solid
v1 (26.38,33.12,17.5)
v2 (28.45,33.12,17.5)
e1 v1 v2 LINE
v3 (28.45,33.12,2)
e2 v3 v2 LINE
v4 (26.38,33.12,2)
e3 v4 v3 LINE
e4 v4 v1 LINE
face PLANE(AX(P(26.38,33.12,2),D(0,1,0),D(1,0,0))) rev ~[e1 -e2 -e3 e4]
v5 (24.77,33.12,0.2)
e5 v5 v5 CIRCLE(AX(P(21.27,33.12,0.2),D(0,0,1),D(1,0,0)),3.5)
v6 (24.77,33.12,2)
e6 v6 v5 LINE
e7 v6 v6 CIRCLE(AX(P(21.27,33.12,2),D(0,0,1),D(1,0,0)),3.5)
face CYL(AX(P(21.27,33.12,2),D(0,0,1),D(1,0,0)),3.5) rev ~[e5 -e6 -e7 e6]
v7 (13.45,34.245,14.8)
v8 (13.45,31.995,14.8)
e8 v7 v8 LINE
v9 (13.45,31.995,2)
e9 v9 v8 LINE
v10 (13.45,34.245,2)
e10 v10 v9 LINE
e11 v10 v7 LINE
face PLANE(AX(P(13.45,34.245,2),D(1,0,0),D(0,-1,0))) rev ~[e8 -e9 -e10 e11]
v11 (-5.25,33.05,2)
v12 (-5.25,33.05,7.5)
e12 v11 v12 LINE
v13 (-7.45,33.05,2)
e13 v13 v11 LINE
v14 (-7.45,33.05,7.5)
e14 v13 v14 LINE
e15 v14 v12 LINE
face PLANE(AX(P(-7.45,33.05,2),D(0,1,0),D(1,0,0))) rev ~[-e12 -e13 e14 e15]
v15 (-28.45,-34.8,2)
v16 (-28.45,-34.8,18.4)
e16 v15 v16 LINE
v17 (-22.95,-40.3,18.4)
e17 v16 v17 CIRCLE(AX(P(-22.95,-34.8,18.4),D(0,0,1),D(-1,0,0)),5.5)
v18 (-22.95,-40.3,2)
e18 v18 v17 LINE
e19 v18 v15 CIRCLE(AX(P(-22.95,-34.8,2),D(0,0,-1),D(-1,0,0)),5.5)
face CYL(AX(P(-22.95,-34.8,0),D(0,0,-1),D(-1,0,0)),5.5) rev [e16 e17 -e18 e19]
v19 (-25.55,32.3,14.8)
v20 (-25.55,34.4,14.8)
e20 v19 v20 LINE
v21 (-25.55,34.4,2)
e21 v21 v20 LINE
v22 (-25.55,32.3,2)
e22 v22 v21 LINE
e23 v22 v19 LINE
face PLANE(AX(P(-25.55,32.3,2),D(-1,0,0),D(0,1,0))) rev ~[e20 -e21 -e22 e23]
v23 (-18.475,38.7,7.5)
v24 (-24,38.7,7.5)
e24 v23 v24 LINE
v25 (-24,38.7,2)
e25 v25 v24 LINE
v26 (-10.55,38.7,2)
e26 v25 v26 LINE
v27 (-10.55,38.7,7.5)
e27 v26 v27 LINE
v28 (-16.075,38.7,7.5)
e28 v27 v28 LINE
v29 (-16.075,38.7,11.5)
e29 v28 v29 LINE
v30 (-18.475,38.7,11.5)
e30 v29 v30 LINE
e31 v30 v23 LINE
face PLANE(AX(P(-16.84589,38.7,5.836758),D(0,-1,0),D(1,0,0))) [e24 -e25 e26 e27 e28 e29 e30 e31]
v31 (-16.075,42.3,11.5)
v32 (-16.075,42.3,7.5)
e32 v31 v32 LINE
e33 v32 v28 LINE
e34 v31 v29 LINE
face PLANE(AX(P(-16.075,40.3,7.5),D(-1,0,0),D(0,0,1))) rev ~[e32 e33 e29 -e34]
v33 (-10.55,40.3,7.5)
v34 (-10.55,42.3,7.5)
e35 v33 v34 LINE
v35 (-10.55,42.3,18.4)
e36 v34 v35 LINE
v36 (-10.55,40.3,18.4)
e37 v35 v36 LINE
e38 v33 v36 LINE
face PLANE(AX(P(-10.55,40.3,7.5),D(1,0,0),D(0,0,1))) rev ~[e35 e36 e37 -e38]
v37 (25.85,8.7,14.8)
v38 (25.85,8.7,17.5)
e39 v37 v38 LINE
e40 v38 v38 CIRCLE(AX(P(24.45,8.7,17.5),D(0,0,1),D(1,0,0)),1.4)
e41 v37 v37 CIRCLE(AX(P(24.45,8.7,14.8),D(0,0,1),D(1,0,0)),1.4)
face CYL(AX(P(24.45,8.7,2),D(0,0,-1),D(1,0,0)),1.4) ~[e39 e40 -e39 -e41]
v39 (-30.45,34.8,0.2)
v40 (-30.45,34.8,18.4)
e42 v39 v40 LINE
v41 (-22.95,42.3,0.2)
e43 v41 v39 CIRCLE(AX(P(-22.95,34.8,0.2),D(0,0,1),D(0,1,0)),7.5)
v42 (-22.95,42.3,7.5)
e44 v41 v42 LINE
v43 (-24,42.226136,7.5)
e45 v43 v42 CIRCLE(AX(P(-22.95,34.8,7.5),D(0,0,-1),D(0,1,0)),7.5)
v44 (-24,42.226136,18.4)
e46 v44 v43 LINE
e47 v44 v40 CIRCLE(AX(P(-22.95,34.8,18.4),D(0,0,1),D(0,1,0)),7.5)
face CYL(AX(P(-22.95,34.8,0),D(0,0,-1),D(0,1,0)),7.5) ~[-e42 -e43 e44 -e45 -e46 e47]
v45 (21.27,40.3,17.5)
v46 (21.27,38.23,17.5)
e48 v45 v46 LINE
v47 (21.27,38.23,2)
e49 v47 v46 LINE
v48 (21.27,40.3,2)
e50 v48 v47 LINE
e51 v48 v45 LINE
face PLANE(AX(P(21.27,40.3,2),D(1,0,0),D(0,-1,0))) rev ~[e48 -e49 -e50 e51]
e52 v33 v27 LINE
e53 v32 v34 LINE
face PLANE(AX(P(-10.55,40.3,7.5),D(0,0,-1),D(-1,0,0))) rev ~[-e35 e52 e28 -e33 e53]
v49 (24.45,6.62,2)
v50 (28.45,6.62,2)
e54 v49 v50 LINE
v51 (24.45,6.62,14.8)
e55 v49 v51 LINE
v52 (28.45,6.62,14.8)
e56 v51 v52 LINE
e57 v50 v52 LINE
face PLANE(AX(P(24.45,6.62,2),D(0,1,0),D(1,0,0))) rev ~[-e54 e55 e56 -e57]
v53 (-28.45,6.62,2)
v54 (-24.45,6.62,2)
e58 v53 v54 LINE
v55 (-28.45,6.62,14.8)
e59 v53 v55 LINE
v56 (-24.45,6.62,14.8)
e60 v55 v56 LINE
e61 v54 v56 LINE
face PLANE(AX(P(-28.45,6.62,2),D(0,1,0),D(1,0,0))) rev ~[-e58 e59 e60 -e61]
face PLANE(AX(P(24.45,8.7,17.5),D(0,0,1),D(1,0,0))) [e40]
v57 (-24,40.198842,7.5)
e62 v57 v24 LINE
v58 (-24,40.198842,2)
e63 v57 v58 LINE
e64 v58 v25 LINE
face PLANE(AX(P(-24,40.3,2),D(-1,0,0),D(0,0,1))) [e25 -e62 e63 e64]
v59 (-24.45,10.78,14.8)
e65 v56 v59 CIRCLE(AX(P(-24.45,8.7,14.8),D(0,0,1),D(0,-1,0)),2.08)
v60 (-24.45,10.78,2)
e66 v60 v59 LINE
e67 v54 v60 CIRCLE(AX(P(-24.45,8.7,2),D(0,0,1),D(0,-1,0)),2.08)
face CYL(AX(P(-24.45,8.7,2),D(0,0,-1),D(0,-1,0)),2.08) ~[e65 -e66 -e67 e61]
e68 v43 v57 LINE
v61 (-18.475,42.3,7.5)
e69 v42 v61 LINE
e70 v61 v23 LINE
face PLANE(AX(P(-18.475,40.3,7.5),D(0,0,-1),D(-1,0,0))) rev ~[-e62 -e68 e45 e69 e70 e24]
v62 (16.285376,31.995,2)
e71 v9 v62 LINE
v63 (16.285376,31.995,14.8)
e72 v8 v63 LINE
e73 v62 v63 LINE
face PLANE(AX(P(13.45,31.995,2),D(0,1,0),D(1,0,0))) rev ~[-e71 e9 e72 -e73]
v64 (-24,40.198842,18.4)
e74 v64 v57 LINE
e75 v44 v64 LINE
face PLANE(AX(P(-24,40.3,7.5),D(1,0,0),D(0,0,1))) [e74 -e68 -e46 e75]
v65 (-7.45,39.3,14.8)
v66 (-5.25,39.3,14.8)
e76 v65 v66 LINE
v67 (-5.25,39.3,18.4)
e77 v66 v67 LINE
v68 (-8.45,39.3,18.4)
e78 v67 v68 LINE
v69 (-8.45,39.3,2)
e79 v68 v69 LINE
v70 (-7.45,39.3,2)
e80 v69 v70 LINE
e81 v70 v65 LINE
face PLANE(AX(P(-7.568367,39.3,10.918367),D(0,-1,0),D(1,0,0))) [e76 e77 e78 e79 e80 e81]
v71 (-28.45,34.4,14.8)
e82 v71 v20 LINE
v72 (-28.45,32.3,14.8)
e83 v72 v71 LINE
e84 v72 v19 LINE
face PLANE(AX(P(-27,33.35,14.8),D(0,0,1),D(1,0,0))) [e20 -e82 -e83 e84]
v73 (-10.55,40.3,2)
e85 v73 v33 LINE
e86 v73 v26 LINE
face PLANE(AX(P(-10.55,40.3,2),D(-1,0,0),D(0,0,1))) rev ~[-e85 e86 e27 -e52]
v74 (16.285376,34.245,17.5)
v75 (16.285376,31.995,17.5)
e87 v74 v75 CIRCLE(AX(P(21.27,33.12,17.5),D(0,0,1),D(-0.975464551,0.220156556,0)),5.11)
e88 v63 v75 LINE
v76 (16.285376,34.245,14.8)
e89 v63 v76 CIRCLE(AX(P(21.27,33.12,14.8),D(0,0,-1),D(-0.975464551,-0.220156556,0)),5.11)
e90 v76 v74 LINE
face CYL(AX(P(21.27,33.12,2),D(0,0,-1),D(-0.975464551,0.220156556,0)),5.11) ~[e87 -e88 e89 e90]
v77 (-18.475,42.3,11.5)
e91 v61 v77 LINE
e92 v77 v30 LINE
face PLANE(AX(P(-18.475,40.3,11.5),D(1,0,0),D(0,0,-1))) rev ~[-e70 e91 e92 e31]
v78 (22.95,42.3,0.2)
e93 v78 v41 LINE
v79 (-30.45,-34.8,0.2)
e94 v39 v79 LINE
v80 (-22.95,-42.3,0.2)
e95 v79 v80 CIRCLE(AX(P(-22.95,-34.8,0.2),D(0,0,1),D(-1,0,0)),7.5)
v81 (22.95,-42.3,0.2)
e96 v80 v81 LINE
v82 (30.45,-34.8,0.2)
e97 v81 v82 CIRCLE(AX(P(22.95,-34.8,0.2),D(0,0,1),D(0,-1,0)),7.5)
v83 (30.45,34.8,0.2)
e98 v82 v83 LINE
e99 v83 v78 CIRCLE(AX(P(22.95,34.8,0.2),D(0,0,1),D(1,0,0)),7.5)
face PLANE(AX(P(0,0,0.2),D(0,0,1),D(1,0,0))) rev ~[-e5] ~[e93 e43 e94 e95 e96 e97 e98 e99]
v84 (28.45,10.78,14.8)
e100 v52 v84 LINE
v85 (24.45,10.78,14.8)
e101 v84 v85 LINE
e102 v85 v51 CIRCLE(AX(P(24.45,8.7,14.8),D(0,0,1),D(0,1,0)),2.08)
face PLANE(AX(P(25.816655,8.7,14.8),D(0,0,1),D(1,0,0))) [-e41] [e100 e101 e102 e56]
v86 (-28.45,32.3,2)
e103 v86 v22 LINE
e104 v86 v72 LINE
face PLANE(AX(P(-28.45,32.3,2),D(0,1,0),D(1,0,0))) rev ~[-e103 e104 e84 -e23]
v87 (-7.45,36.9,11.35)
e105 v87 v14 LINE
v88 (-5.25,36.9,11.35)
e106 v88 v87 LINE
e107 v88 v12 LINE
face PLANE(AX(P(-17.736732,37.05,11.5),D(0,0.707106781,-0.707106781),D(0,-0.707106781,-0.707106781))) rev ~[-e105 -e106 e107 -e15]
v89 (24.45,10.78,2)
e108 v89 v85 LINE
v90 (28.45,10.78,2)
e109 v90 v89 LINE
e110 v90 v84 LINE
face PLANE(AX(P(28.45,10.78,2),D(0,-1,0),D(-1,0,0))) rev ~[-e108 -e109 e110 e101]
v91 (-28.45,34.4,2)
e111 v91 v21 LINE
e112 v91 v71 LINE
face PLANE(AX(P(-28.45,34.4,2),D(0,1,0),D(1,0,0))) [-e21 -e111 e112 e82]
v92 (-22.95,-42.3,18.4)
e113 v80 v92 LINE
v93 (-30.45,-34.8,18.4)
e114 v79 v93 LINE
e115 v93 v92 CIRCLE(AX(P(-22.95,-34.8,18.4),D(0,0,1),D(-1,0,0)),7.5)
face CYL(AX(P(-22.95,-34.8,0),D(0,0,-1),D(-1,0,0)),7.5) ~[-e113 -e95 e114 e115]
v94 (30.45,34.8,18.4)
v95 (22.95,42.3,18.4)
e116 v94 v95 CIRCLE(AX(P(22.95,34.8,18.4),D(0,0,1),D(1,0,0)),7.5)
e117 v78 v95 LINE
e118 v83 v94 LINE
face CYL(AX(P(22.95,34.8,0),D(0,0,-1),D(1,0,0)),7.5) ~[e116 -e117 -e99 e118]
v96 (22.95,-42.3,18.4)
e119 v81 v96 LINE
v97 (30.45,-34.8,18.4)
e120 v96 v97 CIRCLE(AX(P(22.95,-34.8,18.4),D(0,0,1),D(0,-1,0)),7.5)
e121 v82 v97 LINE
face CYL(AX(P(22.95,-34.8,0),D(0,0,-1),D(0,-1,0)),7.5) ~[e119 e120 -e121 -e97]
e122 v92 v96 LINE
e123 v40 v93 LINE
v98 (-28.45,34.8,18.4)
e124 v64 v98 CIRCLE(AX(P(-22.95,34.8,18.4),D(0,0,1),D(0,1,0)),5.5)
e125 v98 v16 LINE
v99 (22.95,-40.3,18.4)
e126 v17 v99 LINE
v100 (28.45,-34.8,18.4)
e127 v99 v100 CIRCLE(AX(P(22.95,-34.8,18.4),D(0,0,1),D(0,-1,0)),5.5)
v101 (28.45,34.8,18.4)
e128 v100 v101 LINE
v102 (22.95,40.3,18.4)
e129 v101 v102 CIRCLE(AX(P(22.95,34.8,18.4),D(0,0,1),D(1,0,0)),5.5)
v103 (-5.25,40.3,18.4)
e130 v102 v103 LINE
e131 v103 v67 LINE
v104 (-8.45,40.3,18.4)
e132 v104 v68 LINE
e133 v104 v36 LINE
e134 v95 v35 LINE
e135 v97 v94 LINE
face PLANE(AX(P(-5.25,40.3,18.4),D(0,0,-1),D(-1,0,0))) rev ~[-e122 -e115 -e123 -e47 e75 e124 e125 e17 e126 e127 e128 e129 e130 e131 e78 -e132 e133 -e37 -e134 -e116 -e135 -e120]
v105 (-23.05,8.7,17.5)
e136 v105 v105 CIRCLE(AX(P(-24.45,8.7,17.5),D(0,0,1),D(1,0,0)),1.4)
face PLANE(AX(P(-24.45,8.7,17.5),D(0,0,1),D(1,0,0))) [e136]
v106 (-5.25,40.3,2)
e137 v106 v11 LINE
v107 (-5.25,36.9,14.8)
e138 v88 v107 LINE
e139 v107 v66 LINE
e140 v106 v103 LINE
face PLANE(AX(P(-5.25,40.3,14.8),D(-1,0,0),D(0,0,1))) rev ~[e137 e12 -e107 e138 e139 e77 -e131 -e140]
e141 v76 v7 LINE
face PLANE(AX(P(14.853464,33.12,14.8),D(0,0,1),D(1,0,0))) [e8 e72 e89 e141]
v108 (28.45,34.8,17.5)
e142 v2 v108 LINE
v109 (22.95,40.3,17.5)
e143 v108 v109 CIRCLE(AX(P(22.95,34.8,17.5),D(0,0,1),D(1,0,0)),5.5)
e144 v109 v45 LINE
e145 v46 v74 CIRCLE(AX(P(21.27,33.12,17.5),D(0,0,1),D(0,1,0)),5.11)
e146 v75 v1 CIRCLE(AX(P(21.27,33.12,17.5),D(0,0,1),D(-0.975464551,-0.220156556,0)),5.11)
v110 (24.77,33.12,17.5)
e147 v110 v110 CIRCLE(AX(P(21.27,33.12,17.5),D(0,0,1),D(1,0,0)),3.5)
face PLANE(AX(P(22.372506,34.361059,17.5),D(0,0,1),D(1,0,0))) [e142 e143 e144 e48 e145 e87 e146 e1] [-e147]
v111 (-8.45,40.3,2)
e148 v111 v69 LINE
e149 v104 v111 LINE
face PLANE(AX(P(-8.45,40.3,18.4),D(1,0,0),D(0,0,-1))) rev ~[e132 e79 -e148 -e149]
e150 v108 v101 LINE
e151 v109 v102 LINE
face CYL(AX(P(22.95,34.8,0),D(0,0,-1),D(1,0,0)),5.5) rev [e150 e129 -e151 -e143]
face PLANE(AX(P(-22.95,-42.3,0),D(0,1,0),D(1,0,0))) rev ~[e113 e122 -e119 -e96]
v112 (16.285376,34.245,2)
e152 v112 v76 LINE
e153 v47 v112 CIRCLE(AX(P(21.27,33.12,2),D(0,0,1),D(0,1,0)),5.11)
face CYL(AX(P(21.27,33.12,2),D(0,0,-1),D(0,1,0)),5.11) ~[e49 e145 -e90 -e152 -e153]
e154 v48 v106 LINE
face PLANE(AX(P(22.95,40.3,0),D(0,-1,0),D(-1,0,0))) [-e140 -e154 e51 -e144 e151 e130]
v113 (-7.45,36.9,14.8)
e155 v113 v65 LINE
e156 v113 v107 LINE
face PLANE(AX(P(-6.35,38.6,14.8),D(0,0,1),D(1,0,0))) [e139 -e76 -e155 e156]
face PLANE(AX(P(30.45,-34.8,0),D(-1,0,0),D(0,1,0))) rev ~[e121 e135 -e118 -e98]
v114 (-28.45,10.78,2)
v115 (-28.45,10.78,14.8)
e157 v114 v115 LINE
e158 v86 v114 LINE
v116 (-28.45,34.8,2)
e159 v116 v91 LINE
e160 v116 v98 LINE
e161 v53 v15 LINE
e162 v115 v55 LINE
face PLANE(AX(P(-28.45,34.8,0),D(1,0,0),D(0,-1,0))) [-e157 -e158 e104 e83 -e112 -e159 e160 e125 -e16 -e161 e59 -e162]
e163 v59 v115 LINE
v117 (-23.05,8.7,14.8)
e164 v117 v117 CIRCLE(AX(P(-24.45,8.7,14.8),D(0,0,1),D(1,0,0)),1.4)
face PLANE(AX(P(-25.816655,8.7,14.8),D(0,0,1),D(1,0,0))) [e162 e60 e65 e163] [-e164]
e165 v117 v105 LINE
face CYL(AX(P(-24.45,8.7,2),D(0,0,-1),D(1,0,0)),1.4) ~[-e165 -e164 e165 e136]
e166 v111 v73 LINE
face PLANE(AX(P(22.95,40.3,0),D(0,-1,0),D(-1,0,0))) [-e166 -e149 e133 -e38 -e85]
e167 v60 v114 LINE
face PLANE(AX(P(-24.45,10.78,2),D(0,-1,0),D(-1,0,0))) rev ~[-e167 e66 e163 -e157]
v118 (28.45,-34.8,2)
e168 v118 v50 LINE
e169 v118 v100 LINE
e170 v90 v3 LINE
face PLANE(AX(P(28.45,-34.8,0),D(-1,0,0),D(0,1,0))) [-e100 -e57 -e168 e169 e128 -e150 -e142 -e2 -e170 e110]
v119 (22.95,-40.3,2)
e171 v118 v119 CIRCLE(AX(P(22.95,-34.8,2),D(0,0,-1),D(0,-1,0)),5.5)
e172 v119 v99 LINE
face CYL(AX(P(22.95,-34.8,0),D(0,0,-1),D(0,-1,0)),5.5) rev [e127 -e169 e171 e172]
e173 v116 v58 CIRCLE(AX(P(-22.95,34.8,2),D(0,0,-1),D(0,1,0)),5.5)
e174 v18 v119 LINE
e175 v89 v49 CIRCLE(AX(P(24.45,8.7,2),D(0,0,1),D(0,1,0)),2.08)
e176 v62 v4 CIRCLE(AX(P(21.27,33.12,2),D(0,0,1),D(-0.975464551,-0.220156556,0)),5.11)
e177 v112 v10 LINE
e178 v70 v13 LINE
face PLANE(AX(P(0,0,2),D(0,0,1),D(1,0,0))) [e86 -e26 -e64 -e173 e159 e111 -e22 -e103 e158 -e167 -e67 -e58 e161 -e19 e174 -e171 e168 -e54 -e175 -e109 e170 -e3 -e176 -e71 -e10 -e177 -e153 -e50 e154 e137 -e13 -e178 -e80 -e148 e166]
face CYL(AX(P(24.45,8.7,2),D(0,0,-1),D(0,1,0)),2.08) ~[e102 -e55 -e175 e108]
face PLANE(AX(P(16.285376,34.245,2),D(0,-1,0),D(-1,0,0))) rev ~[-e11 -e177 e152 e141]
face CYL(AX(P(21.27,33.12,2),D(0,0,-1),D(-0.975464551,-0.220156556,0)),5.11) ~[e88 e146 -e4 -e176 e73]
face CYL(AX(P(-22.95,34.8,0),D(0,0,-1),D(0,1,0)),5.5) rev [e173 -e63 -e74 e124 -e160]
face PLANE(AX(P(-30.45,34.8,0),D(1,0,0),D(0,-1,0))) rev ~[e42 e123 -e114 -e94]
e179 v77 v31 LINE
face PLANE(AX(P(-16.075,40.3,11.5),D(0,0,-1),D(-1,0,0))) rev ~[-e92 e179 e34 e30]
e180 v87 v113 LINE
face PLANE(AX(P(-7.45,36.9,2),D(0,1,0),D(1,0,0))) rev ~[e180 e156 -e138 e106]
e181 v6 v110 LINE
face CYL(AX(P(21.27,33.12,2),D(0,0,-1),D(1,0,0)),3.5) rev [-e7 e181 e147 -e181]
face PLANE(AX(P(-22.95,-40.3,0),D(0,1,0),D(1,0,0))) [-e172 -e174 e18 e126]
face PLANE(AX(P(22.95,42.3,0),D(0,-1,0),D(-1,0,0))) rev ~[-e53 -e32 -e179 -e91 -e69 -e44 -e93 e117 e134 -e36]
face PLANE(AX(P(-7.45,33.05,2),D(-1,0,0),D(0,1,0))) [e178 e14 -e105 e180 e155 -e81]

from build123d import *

# Parameters (mm, degrees)
F1_DEPTH    = 18.4
F2_T        = -2
F3_DEPTH    = 0.2
F4_R        = 1.4
F4_W        = 2.9
F4_H        = 2.1
F4_W_2      = 2.2
F4_H_2      = 3.4
F5_DEPTH    = 12.8
F4_R_2      = 3.5
F6_DEPTH    = 15.5
F4_H_3      = 3.85
F7_DEPTH    = 9.5
F8_T4_DEPTH = 22.7734639037
F9_DEPTH    = 1.801
F11_DEPTH   = 1
F10_W       = 1.05
F10_H       = 5.5
F12_DEPTH   = 1.6
F10_H_2     = 10.9
F13_DEPTH   = 3


# Not quite as in the source:
# - a fillet or chamfer that OpenCascade refuses, or shapes differently, is made with other operations: its cross-section is extruded or revolved along the edge and cut away or added


with BuildPart() as f1:
    # F0 (on Top) → F1 (new body)
    with BuildSketch(Plane.XY):
        with BuildLine():
            Line((-22.95, -42.3), (22.95, -42.3))
            ThreePointArc((22.95, -42.3), (28.2533008589, -40.1033008589), (30.45, -34.8))
            Line((30.45, -34.8), (30.45, 34.8))
            ThreePointArc((30.45, 34.8), (28.2533008589, 40.1033008589), (22.95, 42.3))
            Line((22.95, 42.3), (-22.95, 42.3))
            ThreePointArc((-22.95, 42.3), (-28.2533008589, 40.1033008589), (-30.45, 34.8))
            Line((-30.45, 34.8), (-30.45, -34.8))
            ThreePointArc((-30.45, -34.8), (-28.2533008589, -40.1033008589), (-22.95, -42.3))
        make_face()
    extrude(amount=F1_DEPTH)

    # F2
    f2_openings = [f1.faces().sort_by_distance(p)[0] for p in [
        (0, 0, 18.4),
    ]]
    offset(amount=F2_T, openings=f2_openings)

    # F3 (cut): a face of the model
    f3_faces = [f1.faces().sort_by_distance(p)[0] for p in [
        (0, 0, 0),
    ]]
    extrude(f3_faces, amount=-F3_DEPTH, mode=Mode.SUBTRACT)

    # F4 (on face) → F5 (join)
    with BuildSketch(Plane.XY.offset(2)):
        with BuildLine():
            Line((24.45, 6.62), (28.45, 6.62))
            Line((28.45, 6.62), (28.45, 10.78))
            Line((28.45, 10.78), (24.45, 10.78))
            ThreePointArc((24.45, 10.78), (22.37, 8.7), (24.45, 6.62))
        make_face()
        with Locations((24.45, 8.7)):
            Circle(F4_R, mode=Mode.SUBTRACT)
        with BuildLine():
            ThreePointArc((-24.45, 6.62), (-22.37, 8.7), (-24.45, 10.78))
            Line((-24.45, 10.78), (-28.45, 10.78))
            Line((-28.45, 10.78), (-28.45, 6.62))
            Line((-28.45, 6.62), (-24.45, 6.62))
        make_face()
        with Locations((-24.45, 8.7)):
            Circle(F4_R, mode=Mode.SUBTRACT)
        with Locations((-27, 33.35)):
            Rectangle(F4_W, F4_H)
        with Locations((-6.35, 38.6)):
            Rectangle(F4_W_2, F4_H_2)
        with BuildLine():
            ThreePointArc((16.2853761426, 31.995), (16.16, 33.12), (16.2853761426, 34.245))
            Line((16.2853761426, 34.245), (13.45, 34.245))
            Line((13.45, 34.245), (13.45, 31.995))
            Line((13.45, 31.995), (16.2853761426, 31.995))
        make_face()
    extrude(amount=F5_DEPTH)

    # F4 (on face) → F6 (join)
    with BuildSketch(Plane.XY.offset(2)):
        with BuildLine():
            Line((22.95, 40.3), (21.27, 40.3))
            Line((21.27, 40.3), (21.27, 38.23))
            ThreePointArc((21.27, 38.23), (18.0791262952, 37.1112936499), (16.2853761426, 34.245))
            ThreePointArc((16.2853761426, 34.245), (16.16, 33.12), (16.2853761426, 31.995))
            ThreePointArc((16.2853761426, 31.995), (21.835982371, 28.0414407598), (26.38, 33.12))
            Line((26.38, 33.12), (28.45, 33.12))
            Line((28.45, 33.12), (28.45, 34.8))
            ThreePointArc((28.45, 34.8), (26.8390872965, 38.6890872965), (22.95, 40.3))
        make_face()
        with Locations((21.27, 33.12)):
            Circle(F4_R_2, mode=Mode.SUBTRACT)
        with Locations((24.45, 8.7)):
            Circle(F4_R)
        with Locations((-24.45, 8.7)):
            Circle(F4_R)
    extrude(amount=F6_DEPTH)

    # F4 (on face) → F7 (join)
    with BuildSketch(Plane.XY.offset(2)):
        with Locations((-6.35, 34.975)):
            Rectangle(F4_W_2, F4_H_3)
    extrude(amount=F7_DEPTH)

    # F8: chamfer of 4 on 1 edges, made by hand


with BuildPart() as f8_tool2:
    # F8_s3 → F8_t4 (new body)
    with BuildSketch(Plane.YZ.offset(-17.7367319519)):
        Polygon((37.05, 11.5), (33.05, 7.5), (33.05, 11.5), align=None)
    extrude(amount=F8_T4_DEPTH)

    split(bisect_by=Plane.XZ.offset(-36.9), keep=Keep.TOP)


with BuildPart() as f1_1:
    add(f1.part)

    # F8_t1: cut F8_tool2
    add(f8_tool2.part, mode=Mode.SUBTRACT)

    # F4 (on face) → F9 (cut, through all)
    with BuildSketch(Plane.XY.offset(2)):
        with Locations((21.27, 33.12)):
            Circle(F4_R_2)
    extrude(amount=-F9_DEPTH, mode=Mode.SUBTRACT)

    # F10 (on face) → F11 (join)
    with BuildSketch(Plane.XZ.offset(-40.3)):
        Polygon((-8.45, 2), (-7.45, 2), (-7.45, 14.8), (-5.25, 14.8), (-5.25, 18.4), (-8.45, 18.4), align=None)
    extrude(amount=F11_DEPTH)

    # F10 (on face) → F12 (join)
    with BuildSketch(Plane.XZ.offset(-40.3)):
        Polygon((-22.95, 2), (-10.55, 2), (-10.55, 7.5), (-16.075, 7.5), (-16.075, 11.5), (-18.475, 11.5), (-18.475, 7.5), (-22.95, 7.5), align=None)
        with Locations((-23.475, 4.75)):
            Rectangle(F10_W, F10_H)
    extrude(amount=F12_DEPTH)

    # F10 (on face) → F13 (cut, symmetric)
    with BuildSketch(Plane.XZ.offset(-40.3)):
        Polygon((-10.55, 7.5), (-10.55, 18.4), (-22.95, 18.4), (-22.95, 7.5), (-18.475, 7.5), (-18.475, 11.5), (-16.075, 11.5), (-16.075, 7.5), align=None)
        with Locations((-23.475, 12.95)):
            Rectangle(F10_W, F10_H_2)
    extrude(amount=F13_DEPTH, both=True, mode=Mode.SUBTRACT)


solid = f1_1.part
